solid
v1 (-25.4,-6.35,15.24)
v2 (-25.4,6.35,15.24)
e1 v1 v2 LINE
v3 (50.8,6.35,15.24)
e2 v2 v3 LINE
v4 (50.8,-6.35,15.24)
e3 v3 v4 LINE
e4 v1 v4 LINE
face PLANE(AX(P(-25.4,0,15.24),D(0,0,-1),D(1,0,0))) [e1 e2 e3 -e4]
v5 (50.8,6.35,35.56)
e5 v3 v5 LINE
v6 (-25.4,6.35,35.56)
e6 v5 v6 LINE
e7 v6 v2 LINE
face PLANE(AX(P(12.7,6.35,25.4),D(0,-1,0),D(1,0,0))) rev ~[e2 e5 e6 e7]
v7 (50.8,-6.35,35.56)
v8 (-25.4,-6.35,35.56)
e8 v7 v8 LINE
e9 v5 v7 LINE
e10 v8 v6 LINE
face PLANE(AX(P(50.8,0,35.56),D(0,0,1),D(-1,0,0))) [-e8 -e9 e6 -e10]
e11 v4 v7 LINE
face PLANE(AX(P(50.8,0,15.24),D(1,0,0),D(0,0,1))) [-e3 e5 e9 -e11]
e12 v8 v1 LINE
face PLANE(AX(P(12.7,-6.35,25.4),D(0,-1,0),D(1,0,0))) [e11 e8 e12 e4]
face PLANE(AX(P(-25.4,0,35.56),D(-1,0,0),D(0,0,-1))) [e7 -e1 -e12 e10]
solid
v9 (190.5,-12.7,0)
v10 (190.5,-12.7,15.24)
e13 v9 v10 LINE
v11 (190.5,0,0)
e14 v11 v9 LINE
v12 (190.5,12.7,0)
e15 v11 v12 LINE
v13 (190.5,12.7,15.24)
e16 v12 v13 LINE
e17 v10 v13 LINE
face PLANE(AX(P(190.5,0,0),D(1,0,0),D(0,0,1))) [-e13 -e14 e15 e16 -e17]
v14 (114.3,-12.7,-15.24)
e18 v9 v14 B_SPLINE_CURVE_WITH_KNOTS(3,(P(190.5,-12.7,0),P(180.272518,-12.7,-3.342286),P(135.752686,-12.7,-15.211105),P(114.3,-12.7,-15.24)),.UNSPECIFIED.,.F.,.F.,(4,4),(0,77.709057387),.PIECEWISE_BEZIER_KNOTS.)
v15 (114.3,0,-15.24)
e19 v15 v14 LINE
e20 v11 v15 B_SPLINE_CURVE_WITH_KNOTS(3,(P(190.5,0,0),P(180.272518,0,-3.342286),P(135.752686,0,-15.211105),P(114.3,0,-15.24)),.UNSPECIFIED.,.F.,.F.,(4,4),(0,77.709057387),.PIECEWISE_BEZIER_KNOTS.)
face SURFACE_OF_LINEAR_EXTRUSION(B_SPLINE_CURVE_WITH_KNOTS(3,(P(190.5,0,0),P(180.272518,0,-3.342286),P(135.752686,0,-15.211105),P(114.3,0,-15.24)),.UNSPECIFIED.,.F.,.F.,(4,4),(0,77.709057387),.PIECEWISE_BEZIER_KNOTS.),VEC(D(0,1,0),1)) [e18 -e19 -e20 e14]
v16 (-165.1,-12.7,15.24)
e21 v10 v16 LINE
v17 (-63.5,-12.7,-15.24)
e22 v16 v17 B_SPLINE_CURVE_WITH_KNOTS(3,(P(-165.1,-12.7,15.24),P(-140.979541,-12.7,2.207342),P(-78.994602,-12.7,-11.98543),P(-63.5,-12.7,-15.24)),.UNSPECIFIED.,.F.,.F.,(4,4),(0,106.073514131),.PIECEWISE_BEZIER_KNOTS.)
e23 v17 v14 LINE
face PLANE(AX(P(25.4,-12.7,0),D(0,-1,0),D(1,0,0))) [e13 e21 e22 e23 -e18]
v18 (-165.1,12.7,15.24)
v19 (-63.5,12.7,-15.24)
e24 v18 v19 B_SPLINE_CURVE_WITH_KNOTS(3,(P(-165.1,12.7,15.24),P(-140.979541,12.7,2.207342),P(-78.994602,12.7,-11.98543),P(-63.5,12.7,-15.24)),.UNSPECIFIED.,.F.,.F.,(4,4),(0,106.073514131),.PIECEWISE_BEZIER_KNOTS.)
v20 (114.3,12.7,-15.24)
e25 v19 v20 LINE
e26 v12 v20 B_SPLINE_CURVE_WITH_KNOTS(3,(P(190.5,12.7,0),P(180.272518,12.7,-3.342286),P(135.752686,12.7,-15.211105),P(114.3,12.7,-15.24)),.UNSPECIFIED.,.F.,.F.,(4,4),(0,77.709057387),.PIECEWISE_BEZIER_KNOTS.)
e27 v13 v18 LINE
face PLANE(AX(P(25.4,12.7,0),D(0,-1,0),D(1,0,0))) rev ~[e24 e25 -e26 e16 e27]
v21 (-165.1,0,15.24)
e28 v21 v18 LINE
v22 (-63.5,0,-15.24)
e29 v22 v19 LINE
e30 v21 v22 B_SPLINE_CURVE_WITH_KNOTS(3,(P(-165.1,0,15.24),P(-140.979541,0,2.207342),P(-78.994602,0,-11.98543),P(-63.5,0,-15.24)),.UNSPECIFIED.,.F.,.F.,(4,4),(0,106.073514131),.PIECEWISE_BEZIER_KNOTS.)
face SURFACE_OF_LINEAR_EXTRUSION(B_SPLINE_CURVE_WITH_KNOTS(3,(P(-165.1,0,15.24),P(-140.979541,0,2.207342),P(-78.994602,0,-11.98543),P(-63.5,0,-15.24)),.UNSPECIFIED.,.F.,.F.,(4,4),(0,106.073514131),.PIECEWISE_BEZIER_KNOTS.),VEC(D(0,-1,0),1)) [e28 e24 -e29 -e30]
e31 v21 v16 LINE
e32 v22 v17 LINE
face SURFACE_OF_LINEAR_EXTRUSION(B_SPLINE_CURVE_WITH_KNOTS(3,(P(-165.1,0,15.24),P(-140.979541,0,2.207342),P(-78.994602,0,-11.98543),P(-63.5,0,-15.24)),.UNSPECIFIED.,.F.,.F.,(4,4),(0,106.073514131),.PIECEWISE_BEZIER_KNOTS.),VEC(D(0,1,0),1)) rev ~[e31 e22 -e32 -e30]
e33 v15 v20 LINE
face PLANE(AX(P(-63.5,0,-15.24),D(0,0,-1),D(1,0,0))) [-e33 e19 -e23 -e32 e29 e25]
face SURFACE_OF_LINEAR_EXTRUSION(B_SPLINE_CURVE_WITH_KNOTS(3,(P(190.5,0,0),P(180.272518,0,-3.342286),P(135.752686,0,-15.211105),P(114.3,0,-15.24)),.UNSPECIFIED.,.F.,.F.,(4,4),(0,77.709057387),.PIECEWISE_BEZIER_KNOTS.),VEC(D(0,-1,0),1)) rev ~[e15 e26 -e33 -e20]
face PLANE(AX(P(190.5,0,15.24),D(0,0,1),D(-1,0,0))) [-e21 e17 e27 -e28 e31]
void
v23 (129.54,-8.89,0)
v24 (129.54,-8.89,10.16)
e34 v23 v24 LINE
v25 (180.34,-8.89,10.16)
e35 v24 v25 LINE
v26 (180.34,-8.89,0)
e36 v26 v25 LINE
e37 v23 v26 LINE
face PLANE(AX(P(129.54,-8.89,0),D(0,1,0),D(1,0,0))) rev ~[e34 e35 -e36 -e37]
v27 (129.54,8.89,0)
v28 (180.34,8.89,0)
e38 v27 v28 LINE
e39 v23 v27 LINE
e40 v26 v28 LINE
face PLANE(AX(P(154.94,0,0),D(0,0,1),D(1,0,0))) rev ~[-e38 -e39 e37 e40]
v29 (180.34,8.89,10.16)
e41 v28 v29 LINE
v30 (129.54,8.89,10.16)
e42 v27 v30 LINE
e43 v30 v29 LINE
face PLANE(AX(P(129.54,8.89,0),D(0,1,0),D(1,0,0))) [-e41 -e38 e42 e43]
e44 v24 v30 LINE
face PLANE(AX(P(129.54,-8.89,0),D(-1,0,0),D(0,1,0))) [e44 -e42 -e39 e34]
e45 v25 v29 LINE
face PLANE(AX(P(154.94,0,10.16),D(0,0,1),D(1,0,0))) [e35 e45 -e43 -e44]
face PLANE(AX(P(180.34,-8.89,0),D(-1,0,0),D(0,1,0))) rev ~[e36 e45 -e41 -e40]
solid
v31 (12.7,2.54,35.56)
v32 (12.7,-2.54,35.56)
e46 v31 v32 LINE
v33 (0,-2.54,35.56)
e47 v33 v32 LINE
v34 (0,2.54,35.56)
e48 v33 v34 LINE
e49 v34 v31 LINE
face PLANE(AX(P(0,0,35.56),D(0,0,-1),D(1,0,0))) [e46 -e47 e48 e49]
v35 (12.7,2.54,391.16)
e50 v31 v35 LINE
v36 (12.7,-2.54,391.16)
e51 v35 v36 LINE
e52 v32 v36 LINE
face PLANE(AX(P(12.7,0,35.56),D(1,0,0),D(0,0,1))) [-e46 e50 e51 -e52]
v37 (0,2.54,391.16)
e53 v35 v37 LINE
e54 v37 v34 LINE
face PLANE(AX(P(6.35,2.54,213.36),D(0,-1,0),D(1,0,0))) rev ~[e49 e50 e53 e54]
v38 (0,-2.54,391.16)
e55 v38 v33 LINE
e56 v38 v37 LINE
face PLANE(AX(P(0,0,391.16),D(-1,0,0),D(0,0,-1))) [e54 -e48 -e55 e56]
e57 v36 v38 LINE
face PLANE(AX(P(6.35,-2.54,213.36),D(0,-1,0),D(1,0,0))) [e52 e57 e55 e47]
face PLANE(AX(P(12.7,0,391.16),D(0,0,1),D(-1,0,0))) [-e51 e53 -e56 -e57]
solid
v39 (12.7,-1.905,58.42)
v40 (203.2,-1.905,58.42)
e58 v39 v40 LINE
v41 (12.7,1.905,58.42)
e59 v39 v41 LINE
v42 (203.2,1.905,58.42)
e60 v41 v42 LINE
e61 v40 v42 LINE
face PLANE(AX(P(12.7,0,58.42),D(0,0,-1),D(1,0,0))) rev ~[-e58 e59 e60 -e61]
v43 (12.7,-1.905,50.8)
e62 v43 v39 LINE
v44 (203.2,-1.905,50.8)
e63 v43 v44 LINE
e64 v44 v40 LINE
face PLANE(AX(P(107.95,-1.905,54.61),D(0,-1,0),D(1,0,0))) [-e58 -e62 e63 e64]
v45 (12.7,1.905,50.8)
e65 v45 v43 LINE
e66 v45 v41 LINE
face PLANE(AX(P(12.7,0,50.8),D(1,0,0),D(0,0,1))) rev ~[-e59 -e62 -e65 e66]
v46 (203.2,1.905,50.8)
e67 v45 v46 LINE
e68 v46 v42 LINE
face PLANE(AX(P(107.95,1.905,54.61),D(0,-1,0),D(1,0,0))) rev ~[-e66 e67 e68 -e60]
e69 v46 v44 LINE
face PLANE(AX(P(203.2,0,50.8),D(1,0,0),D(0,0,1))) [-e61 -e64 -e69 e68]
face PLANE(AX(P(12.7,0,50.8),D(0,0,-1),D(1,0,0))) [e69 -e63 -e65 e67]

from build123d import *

# Parameters (mm, degrees)
F1_DEPTH = 12.7
F2_DEPTH = 2.54
F0_W     = 190.5
F0_H     = 7.62
F3_DEPTH = 1.905
F4_DEPTH = 6.35
F5_W     = 50.8
F5_H     = 17.78
F6_DEPTH = 10.16


# Not quite as in the source:
# - a feature names something its author has since deleted; it is built from what else it names


with BuildPart() as f1:
    # F0 (on Front) → F1 (new body, symmetric)
    with BuildSketch(Plane.XZ):
        Polygon((114.3, -15.24), (114.3, 15.24), (50.8, 15.24), (-25.4, 15.24), (-63.5, 15.24), (-63.5, -15.24), align=None)
        with BuildLine():
            add(Edge.make_bspline(
                [(-165.1, 15.24), (-140.9795414875, 2.2073420069), (-78.9946019822, -11.9854301172), (-63.5, -15.24)],
                knots=[0, 0, 0, 0, 106.0735141305, 106.0735141305, 106.0735141305, 106.0735141305], degree=3))
            Line((-63.5, -15.24), (-63.5, 15.24))
            Line((-63.5, 15.24), (-165.1, 15.24))
        make_face()
        with BuildLine():
            Line((190.5, 15.24), (114.3, 15.24))
            Line((114.3, 15.24), (114.3, -15.24))
            add(Edge.make_bspline(
                [(190.5, 0), (180.2725183696, -3.34228636), (135.7526859203, -15.2111054963), (114.3, -15.24)],
                knots=[0, 0, 0, 0, 77.7090573872, 77.7090573872, 77.7090573872, 77.7090573872], degree=3))
            Line((190.5, 0), (190.5, 15.24))
        make_face()
    extrude(amount=F1_DEPTH, both=True)

    # F5 (on Top) → F6 (cut)
    with BuildSketch(Plane.XY):
        with Locations((154.94, 0)):
            Rectangle(F5_W, F5_H)
    extrude(amount=F6_DEPTH, mode=Mode.SUBTRACT)


with BuildPart() as f2:
    # F0 (on Front) → F2 (new body, symmetric)
    with BuildSketch(Plane.XZ):
        Polygon((0, 35.56), (12.7, 35.56), (12.7, 50.8), (12.7, 58.42), (12.7, 391.16), (0, 391.16), align=None)
    extrude(amount=F2_DEPTH, both=True)


with BuildPart() as f3:
    # F0 (on Front) → F3 (new body, symmetric)
    with BuildSketch(Plane.XZ):
        with Locations((107.95, 54.61)):
            Rectangle(F0_W, F0_H)
    extrude(amount=F3_DEPTH, both=True)


with BuildPart() as f4:
    # F0 (on Front) → F4 (new body, symmetric)
    with BuildSketch(Plane.XZ):
        Polygon((-25.4, 15.24), (50.8, 15.24), (50.8, 35.56), (12.7, 35.56), (0, 35.56), (-25.4, 35.56), align=None)
    extrude(amount=F4_DEPTH, both=True)


solid = Compound([f1.part, f2.part, f3.part, f4.part])
